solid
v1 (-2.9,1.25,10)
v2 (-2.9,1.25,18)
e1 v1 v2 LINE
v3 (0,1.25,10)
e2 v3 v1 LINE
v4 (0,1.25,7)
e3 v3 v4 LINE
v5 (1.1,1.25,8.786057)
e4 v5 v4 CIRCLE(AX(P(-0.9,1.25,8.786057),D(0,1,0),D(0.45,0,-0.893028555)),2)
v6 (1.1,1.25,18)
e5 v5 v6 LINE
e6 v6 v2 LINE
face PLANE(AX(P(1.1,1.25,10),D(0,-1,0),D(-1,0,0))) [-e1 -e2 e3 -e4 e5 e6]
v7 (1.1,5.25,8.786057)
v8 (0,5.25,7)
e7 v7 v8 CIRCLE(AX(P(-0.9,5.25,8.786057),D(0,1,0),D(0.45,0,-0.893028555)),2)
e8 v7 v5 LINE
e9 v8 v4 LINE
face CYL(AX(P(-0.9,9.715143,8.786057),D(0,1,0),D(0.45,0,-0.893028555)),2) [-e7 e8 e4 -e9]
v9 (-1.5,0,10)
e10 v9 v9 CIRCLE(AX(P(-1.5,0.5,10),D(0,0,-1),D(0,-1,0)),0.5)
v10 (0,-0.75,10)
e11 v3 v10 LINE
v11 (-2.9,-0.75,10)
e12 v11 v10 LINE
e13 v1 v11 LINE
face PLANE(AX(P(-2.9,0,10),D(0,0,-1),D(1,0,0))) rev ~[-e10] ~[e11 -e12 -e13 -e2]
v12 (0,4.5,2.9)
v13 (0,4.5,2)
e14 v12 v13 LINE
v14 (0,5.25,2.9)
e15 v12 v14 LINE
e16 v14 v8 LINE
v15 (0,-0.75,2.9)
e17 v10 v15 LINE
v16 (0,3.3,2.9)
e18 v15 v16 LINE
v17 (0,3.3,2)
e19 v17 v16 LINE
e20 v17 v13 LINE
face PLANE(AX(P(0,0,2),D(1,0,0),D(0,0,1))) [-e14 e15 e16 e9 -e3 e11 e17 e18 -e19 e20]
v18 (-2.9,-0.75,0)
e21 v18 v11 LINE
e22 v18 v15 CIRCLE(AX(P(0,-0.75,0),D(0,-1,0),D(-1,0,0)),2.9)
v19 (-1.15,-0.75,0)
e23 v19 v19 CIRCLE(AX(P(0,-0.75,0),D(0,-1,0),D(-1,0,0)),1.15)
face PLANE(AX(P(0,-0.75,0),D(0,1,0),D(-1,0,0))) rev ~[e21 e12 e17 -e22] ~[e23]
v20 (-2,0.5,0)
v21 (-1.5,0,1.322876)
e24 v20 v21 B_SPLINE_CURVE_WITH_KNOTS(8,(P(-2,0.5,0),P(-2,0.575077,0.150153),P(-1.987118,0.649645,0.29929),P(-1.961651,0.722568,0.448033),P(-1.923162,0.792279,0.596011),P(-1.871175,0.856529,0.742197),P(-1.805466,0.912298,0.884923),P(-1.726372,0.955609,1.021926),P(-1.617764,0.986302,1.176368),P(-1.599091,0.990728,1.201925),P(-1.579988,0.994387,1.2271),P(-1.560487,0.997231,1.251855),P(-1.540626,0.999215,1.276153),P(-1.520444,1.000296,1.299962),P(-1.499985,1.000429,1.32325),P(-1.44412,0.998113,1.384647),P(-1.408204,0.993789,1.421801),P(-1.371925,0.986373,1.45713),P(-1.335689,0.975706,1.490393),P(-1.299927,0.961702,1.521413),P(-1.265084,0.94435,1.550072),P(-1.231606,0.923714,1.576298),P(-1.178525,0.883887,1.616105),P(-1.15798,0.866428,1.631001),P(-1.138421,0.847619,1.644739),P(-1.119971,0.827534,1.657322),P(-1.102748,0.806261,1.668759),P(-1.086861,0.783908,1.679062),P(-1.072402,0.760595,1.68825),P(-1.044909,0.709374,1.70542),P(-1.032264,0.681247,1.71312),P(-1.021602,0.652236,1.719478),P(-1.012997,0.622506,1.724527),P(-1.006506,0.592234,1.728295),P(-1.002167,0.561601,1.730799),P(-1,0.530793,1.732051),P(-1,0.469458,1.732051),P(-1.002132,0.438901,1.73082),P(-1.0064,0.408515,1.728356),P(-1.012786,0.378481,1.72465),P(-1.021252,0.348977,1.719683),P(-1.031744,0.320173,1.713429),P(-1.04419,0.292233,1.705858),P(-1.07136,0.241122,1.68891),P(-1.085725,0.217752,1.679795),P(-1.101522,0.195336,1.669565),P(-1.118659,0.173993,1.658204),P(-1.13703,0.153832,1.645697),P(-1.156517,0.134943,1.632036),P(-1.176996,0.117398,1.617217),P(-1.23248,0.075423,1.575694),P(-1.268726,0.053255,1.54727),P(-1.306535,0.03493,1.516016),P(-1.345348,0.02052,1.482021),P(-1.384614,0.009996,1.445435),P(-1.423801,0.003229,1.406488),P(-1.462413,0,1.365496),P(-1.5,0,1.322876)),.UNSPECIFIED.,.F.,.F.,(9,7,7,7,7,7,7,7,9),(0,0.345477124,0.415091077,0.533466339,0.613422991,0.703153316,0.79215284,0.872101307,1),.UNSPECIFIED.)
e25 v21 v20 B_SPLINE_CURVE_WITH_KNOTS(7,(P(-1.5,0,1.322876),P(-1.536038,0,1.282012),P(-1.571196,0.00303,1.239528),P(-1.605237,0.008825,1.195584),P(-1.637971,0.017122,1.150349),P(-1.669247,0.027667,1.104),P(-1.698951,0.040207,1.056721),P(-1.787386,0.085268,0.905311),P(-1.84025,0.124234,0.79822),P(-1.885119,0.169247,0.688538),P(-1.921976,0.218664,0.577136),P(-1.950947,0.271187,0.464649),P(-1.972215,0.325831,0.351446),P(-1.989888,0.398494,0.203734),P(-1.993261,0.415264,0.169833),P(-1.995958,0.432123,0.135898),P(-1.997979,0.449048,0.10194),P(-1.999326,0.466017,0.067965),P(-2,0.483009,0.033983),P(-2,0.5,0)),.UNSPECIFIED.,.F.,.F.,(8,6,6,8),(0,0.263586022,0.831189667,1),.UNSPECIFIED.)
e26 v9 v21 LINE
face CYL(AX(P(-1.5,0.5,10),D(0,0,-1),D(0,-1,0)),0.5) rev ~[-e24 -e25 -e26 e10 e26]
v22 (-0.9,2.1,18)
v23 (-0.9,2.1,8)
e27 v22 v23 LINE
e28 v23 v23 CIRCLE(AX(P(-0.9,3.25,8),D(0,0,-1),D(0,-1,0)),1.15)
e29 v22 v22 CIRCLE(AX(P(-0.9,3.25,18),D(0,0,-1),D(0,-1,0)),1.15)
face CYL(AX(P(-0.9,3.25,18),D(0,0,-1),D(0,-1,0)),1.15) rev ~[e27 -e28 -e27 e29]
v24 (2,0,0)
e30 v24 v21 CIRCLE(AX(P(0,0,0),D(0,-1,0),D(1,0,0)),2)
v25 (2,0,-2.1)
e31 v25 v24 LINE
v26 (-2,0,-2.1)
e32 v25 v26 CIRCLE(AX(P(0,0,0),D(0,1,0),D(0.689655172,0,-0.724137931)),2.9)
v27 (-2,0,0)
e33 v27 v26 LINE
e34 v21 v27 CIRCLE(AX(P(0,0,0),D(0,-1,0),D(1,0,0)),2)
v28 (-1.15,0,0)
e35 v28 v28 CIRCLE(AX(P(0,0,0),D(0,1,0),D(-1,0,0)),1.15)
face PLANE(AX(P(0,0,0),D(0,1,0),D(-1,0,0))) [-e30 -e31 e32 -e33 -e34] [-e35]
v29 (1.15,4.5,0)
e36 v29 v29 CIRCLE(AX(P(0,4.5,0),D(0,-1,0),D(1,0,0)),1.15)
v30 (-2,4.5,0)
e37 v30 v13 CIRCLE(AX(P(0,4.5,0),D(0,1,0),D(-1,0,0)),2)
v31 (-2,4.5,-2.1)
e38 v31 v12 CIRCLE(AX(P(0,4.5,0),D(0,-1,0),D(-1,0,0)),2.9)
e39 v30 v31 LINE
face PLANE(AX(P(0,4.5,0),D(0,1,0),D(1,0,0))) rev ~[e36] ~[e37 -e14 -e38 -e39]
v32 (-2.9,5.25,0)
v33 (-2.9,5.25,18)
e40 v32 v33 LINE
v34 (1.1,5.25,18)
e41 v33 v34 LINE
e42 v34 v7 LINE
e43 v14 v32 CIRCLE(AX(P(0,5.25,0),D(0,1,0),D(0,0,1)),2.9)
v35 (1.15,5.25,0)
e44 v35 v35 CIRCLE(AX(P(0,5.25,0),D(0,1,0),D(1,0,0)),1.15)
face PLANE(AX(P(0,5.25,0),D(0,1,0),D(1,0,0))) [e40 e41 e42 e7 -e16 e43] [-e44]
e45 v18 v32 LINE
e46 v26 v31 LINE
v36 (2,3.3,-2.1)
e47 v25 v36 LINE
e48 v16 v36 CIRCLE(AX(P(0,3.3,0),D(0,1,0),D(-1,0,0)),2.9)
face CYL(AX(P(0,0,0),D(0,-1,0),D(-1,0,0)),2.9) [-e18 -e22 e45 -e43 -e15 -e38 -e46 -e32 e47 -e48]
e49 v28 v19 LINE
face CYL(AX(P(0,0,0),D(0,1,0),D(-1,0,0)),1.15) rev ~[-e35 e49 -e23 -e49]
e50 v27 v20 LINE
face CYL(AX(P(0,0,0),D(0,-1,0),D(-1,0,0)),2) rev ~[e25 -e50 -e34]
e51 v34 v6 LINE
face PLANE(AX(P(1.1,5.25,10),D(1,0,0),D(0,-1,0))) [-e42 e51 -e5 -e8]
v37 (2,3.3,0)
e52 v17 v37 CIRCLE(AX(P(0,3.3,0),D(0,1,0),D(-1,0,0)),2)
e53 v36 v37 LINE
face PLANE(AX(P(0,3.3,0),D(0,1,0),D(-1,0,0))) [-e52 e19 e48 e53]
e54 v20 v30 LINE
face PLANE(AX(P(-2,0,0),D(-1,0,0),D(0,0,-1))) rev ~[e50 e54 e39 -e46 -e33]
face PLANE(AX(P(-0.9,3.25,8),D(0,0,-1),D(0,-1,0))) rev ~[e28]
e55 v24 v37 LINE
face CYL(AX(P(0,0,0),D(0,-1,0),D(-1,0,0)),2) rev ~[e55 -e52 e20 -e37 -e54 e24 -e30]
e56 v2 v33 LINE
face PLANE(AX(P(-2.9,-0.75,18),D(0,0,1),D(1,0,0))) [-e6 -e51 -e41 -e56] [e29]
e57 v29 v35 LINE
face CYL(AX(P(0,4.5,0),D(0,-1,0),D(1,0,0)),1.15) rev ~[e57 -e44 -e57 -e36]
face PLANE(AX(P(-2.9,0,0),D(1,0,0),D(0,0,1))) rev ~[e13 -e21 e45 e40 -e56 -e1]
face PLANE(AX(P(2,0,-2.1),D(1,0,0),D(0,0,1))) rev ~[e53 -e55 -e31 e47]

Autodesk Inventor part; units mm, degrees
ref_plane "YZ Plane" through (0, 0, 0) normal (1, 0, 0) x (0, 1, 0)
ref_plane "XZ Plane" through (0, 0, 0) normal (0, 1, 0) x (-1, 0, 0)
ref_plane "XY Plane" through (0, 0, 0) normal (0, 0, 1) x (1, 0, 0)
sketch "スケッチ1" plane through (0, 0, 0) normal (0, 1, 0) x (-1, 0, 0)
  circle A0 centre (0, 0) radius 1.15
  circle A1 centre (0, 0) radius 2
  circle A2 centre (0, 0) radius 2.9
  line L0 (-2, 0) -> (2, 0)
  line L1 (2, 0) -> (2, -2.9)
  line L2 (2, -2.9) -> (-2, -2.9)
  line L3 (-2, -2.9) -> (-2, 0)
  line L4 (0, 0) -> (0, 2.9)
  line L5 (0, 0) -> (2.9, 0)
  line L6 (2.9, 0) -> (2.9, 15)
  line L7 (2.9, 15) -> (0, 15)
  line L8 (0, 15) -> (0, 0)
  line L9 (0, 0) -> (2.9, 0)
  line L10 (2.9, 0) -> (2.9, 10)
  line L11 (2.9, 10) -> (0, 10)
  line L12 (0, 10) -> (0, 0)
  point P0 (0, 2)
  point P1 (-2, -2.1)
  point P2 (2, -2.1)
  dimension "d1" = 4
  dimension "d2" = 5.8
  dimension "d0" = 2.3
  dimension "d3" = 15
  dimension "d4" = 10
extrude "押し出し1" add sketch "スケッチ1" along normal blind 3.3 contours A1 L3 A2 L4
extrude "押し出し2" add sketch "スケッチ1" along normal blind 4.5 contours L5 A2 L1 | A1 L4 A2 L5 | A2 L8 L11 L6
extrude "押し出し3" add sketch "スケッチ1" against normal blind 0.75 contours L0 A1 A0 | A0 L4 A1 L0 | A0 L0 A1 L4 | L1 A2 L3 A1 | L5 A2 L1 | A1 L4 A2 L5 | A1 L3 A2 L4 | A2 L8 L11 L6
sketch "スケッチ2" plane through (0, 4.5, 0) normal (0, 1, 0) x (1, 0, 0)
  circle A0 centre (0, 0) radius 1.15
  line L0 (-2, 0) -> (-2, 2.1) projected
  circle A1 centre (0, 0) radius 2
  arc A2 (-2, 2.1) -> (-2.9, 0) centre (0, 0) ccw projected
  circle A3 centre (0, 0) radius 2.9
  line L1 (-2, 0) -> (2, 0)
  line L2 (2, 0) -> (2, 2.9)
  line L3 (2, 2.9) -> (-2, 2.9)
  line L4 (-2, 2.9) -> (-2, 0)
  line L5 (-2.9, 0) -> (-2.9, -10) projected
  line L6 (-2.9, -10) -> (0, -10) projected
  line L7 (-2.9, 0) -> (0, 0)
  line L8 (0, 0) -> (0, -10)
  line L9 (0, -10) -> (-2.9, -10)
  line L10 (-2.9, -10) -> (-2.9, 0)
  point P0 (0, -2.9)
extrude "押し出し4" add sketch "スケッチ2" along normal blind 0.75 contours L1 A1 L8 A0 | A0 L1 A1 | A0 L8 A1 L1 | L2 A3 L8 A1 | A1 L0 A3 L2 | L7 A2 L0 | A1 L8 A3 L7 | A3 L8 L6 L5
sketch "スケッチ3" plane through (-2.9, -0.75, 10) normal (0, 0, 1) x (1, 0, 0)
  line L0 (4.05, 0) -> (1.75, 0) projected
  line L1 (0, 0) -> (0, 6) projected
  line L2 (2.9, 0) -> (0, 0)
  line L3 (0, 0) -> (0, 0.75)
  line L4 (0, 0.75) -> (2.9, 0.75)
  line L5 (2.9, 0.75) -> (2.9, 0)
  line L6 (2.9, 0.75) -> (1.4, 0.75)
  line L7 (1.4, 0.75) -> (1.4, 1.15)
  line L8 (1.4, 1.15) -> (2.9, 1.15)
  line L9 (2.9, 1.15) -> (2.9, 0.75)
  line L10 (1.4, 0.75) -> (1.4, 1.25)
  dimension "d13" = 1.5
  dimension "d14" = 0.4
  dimension "d15" = 0.5
hole "穴1" at (-1.5, 0.5, 10) direction (0, 0, -1) diameter 1 end through all
sketch "スケッチ4" plane through (-2.9, -0.75, 10) normal (0, 0, 1) x (1, 0, 0)
  line L0 (0, 0) -> (0, 6) projected
  line L1 (0, 6) -> (4, 6)
  line L2 (4, 6) -> (4, 2)
  line L3 (4, 2) -> (0, 2)
  line L4 (0, 2) -> (0, 6)
  point P0 (2.9, 0.75)
  dimension "d23" = 4
  dimension "d24" = 4
extrude "押し出し5" add sketch "スケッチ4" along normal blind 8 and the other way blind 3
sketch "スケッチ5" plane through (-2.9, -0.75, 18) normal (0, 0, 1) x (1, 0, 0)
  line L0 (5.8, 6) -> (0, 6) projected
  line L1 (0, 6) -> (2, 6)
  line L2 (2, 6) -> (2, 4)
  line L3 (2, 4) -> (0, 4)
  line L4 (0, 4) -> (0, 6)
  point P0 (2.9, 0.75)
  point P1 (2.9, 6)
  dimension "d29" = 2
  dimension "d30" = 2
hole "穴2" at (-0.9, 3.25, 18) direction (0, 0, -1) diameter 2.3 depth 10
fillet "フィレット1" radius 2 1 edges at (1.1, 3.25, 7)
properties part number "srod1.3"
